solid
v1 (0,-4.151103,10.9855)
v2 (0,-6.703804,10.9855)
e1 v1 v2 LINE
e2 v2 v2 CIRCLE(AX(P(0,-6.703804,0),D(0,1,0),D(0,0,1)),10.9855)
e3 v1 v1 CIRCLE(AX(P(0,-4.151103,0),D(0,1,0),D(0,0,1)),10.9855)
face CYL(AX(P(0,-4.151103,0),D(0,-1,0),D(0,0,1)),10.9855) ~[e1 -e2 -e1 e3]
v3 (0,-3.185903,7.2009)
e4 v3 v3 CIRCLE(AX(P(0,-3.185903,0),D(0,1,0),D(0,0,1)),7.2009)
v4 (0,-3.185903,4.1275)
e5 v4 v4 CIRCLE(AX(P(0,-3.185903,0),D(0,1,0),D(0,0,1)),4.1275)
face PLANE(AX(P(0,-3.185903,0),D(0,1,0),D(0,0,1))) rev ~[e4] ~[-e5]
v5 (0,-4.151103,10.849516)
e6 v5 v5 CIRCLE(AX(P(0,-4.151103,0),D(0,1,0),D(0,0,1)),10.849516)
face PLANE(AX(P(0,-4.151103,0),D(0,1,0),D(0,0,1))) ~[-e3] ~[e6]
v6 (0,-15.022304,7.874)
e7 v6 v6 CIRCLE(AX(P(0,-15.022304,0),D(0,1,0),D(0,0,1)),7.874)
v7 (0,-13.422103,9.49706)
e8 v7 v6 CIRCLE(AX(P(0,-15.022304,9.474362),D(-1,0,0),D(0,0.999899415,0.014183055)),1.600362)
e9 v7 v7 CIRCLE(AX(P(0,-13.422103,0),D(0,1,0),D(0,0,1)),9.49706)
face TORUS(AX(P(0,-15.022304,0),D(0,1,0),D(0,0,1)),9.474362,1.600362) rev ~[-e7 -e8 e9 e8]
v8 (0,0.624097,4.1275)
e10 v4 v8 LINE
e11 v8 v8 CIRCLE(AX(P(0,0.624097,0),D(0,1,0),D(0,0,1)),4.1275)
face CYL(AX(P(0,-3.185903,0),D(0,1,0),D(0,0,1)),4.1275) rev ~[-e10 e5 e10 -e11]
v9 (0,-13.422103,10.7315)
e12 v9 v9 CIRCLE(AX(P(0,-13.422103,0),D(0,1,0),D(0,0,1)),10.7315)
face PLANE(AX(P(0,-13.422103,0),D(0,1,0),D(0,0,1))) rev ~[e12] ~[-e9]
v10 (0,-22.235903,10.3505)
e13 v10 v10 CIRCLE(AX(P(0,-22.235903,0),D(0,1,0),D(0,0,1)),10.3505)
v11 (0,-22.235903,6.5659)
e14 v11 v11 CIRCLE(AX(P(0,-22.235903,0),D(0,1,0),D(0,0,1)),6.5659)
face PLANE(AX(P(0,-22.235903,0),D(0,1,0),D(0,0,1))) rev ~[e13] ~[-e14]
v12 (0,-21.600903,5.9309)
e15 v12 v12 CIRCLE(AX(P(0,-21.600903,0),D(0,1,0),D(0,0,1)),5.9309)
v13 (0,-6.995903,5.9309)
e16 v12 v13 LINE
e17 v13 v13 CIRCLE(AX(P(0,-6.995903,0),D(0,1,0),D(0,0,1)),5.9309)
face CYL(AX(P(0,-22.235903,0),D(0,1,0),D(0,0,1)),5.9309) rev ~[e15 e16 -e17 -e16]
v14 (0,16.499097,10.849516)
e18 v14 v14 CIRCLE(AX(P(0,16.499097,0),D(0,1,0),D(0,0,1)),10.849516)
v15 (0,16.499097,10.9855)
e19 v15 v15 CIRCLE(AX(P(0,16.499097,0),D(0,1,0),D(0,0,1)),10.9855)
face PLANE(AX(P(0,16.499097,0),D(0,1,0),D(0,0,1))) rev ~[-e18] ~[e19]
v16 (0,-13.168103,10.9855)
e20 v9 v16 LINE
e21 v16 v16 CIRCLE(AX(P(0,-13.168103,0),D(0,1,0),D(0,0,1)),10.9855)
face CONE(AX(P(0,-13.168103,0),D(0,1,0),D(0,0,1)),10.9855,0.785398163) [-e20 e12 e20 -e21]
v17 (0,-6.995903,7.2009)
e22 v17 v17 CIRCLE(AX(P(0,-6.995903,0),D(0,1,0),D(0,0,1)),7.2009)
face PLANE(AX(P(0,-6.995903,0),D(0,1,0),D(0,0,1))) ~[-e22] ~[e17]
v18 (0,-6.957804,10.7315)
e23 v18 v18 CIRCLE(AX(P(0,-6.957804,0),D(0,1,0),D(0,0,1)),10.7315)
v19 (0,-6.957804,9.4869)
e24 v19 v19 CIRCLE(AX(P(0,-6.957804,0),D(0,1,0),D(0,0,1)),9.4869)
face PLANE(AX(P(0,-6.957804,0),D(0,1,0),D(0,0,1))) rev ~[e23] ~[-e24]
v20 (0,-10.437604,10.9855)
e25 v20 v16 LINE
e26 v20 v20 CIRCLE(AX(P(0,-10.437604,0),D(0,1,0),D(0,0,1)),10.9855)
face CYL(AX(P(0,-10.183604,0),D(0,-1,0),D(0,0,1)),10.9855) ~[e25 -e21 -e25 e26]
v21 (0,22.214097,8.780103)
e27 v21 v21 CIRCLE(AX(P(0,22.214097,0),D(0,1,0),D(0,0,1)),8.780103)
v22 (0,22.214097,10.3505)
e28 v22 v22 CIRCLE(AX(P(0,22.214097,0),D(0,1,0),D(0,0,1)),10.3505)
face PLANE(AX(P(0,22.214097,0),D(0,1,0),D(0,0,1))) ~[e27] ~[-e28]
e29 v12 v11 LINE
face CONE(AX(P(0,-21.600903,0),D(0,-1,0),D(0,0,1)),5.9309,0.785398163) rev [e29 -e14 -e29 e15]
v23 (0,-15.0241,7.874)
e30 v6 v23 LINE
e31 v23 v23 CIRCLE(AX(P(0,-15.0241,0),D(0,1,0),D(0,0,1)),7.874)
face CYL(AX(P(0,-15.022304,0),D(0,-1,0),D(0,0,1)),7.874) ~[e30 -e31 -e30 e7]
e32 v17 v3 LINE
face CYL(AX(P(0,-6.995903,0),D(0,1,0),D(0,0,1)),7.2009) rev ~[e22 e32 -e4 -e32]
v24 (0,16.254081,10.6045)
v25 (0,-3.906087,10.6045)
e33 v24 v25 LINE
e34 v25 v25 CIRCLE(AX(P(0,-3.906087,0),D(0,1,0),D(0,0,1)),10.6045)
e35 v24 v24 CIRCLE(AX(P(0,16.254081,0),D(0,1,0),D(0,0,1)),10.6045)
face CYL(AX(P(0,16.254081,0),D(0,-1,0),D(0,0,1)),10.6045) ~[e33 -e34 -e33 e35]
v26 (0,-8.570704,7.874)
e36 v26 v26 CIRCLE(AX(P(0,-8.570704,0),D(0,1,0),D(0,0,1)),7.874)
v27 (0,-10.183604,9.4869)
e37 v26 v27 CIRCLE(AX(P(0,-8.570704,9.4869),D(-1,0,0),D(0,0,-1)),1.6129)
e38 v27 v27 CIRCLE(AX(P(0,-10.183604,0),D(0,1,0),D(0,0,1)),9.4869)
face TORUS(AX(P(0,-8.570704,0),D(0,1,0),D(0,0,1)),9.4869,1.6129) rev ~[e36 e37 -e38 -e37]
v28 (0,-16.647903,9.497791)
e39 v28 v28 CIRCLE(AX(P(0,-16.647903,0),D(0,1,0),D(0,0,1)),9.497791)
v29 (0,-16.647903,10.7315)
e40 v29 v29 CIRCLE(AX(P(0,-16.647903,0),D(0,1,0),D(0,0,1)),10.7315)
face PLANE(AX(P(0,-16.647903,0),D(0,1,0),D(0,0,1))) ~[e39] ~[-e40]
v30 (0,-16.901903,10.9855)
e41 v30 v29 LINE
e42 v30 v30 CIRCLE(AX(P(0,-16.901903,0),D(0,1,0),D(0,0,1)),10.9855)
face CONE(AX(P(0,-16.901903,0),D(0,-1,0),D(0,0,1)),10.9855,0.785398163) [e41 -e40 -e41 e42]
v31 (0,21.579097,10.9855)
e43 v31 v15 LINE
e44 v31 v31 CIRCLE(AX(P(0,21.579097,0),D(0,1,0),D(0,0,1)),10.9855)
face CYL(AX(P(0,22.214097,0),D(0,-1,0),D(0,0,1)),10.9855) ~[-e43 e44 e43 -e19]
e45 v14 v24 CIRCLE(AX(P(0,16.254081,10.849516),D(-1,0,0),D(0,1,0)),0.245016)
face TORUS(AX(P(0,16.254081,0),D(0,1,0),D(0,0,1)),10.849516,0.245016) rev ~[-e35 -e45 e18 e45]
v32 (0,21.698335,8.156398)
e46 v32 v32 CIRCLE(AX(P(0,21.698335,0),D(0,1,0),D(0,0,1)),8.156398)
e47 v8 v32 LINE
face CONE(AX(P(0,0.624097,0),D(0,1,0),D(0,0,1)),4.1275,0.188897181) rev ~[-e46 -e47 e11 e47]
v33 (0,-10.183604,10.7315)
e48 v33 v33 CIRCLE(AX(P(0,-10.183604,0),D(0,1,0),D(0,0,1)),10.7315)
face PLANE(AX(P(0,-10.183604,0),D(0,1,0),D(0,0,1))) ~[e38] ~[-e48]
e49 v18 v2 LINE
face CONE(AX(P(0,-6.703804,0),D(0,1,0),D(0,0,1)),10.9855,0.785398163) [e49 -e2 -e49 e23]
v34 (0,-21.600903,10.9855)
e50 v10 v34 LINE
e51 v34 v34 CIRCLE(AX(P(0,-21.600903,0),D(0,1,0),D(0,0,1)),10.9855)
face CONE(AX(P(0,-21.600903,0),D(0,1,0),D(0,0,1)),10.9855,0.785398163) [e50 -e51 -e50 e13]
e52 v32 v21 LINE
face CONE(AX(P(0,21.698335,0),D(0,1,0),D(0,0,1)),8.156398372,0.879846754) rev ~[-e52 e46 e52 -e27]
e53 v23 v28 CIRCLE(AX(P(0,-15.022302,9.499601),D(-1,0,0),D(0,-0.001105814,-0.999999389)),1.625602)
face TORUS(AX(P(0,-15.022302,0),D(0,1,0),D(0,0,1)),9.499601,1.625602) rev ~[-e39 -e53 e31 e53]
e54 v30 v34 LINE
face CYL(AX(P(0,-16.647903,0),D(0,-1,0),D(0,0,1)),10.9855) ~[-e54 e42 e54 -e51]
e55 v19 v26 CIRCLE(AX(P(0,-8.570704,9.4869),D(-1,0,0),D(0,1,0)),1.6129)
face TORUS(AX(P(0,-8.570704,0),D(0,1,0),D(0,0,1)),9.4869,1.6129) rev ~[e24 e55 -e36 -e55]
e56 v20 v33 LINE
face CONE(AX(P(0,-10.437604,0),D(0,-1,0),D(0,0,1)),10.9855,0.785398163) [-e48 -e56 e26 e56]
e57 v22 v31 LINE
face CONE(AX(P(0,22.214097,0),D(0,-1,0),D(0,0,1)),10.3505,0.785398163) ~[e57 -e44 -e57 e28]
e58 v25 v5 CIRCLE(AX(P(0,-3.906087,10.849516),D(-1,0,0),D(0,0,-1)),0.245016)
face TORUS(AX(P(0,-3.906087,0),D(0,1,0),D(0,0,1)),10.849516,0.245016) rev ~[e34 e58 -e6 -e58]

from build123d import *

# Parameters (mm, degrees)
F3_SIZE = 0.635
F4_SIZE = 0.254


# Not quite as in the source:
# - a fillet or chamfer that OpenCascade refuses, or shapes differently, is made with other operations: its cross-section is extruded or revolved along the edge and cut away or added
# - ends of sketch curves that miss each other by under 0.0002 mm in the source are joined


with BuildPart() as f1:
    # F0 (on Right) → F1 (revolve)
    with BuildSketch(Plane.YZ):
        with BuildLine():
            Line((22.2140969225, 8.255), (22.2140969225, 10.9855))
            Line((22.2140969225, 10.9855), (16.4990969225, 10.9855))
            Line((16.4990969225, 10.9855), (16.4990969225, 10.8495159149))
            ThreePointArc((16.4990969225, 10.8495159149), (16.4273334225, 10.6762635), (16.2540810076, 10.6045))
            Line((16.2540810076, 10.6045), (-3.9060871626, 10.6045))
            ThreePointArc((-3.9060871626, 10.6045), (-4.0793395775, 10.6762635), (-4.1511030775, 10.8495159149))
            Line((-4.1511030775, 10.8495159149), (-4.1511030775, 10.9855))
            Line((-4.1511030775, 10.9855), (-6.9578040841, 10.9855))
            Line((-6.9578040841, 10.9855), (-6.9578040841, 9.4869))
            ThreePointArc((-6.9578040841, 9.4869), (-7.4302115567, 8.3464074726), (-8.5707040841, 7.874))
            ThreePointArc((-8.5707040841, 7.874), (-9.7111966115, 8.3464074726), (-10.1836040841, 9.4869))
            Line((-10.1836040841, 9.4869), (-10.1836040841, 10.9855))
            Line((-10.1836040841, 10.9855), (-13.4221030775, 10.9855))
            Line((-13.4221030775, 10.9855), (-13.4221030775, 9.49706))
            ThreePointArc((-13.4221030775, 9.49706), (-13.8826805689, 8.3507887918), (-15.0223040841, 7.874))
            Line((-15.0223040841, 7.874), (-15.0241, 7.874))
            ThreePointArc((-15.0241, 7.874), (-16.1717722238, 8.3501225728), (-16.6479030775, 9.4977909507))
            Line((-16.6479030775, 9.4977909507), (-16.6479030775, 10.9855))
            Line((-16.6479030775, 10.9855), (-22.2359030775, 10.9855))
            Line((-22.2359030775, 10.9855), (-22.2359030775, 5.9309))
            Line((-22.2359030775, 5.9309), (-6.9959030775, 5.9309))
            Line((-6.9959030775, 5.9309), (-6.9959030775, 7.2009))
            Line((-6.9959030775, 7.2009), (-3.1859030775, 7.2009))
            Line((-3.1859030775, 7.2009), (-3.1859030775, 5.9309))
            Line((-3.1859030775, 5.9309), (-3.1859030775, 4.1275))
            Line((-3.1859030775, 4.1275), (0.6240969225, 4.1275))
            Line((0.6240969225, 4.1275), (22.2140969225, 8.255))
        make_face()
    revolve(axis=Axis((0, -0.0109030775, 0), (0, 1, 0)))

    # F2: chamfer of 0.635 on 2 edges, made by hand

    # F2_s1 → F2_t2 (revolve, cut)
    with BuildSketch(Plane.YZ):
        Polygon((21.6983345602, 8.1563983719), (22.2140969225, 8.780102938), (22.2140969225, 8.255), align=None)
    revolve(axis=Axis((0, 22.2140969225, 0), (0, 1, 0)), mode=Mode.SUBTRACT)

    # F2_s3 → F2_t4 (revolve, cut)
    with BuildSketch(Plane.YZ):
        Polygon((22.2140969225, 10.3505), (21.5790969225, 10.9855), (22.2140969225, 10.9855), align=None)
    revolve(axis=Axis((0, 22.2140969225, 0), (0, 1, 0)), mode=Mode.SUBTRACT)

    # F3
    f3_edges = [f1.edges().sort_by_distance(p)[0] for p in [
        (0, -22.235903, -10.9855),
        (0, -22.235903, -5.9309),
    ]]
    chamfer(f3_edges, length=F3_SIZE)

    # F4
    f4_edges = [f1.edges().sort_by_distance(p)[0] for p in [
        (0, -6.957804, -10.9855),
        (0, -13.422103, -10.9855),
        (0, -16.647903, -10.9855),
        (0, -10.183604, -10.9855),
    ]]
    chamfer(f4_edges, length=F4_SIZE)


solid = f1.part
